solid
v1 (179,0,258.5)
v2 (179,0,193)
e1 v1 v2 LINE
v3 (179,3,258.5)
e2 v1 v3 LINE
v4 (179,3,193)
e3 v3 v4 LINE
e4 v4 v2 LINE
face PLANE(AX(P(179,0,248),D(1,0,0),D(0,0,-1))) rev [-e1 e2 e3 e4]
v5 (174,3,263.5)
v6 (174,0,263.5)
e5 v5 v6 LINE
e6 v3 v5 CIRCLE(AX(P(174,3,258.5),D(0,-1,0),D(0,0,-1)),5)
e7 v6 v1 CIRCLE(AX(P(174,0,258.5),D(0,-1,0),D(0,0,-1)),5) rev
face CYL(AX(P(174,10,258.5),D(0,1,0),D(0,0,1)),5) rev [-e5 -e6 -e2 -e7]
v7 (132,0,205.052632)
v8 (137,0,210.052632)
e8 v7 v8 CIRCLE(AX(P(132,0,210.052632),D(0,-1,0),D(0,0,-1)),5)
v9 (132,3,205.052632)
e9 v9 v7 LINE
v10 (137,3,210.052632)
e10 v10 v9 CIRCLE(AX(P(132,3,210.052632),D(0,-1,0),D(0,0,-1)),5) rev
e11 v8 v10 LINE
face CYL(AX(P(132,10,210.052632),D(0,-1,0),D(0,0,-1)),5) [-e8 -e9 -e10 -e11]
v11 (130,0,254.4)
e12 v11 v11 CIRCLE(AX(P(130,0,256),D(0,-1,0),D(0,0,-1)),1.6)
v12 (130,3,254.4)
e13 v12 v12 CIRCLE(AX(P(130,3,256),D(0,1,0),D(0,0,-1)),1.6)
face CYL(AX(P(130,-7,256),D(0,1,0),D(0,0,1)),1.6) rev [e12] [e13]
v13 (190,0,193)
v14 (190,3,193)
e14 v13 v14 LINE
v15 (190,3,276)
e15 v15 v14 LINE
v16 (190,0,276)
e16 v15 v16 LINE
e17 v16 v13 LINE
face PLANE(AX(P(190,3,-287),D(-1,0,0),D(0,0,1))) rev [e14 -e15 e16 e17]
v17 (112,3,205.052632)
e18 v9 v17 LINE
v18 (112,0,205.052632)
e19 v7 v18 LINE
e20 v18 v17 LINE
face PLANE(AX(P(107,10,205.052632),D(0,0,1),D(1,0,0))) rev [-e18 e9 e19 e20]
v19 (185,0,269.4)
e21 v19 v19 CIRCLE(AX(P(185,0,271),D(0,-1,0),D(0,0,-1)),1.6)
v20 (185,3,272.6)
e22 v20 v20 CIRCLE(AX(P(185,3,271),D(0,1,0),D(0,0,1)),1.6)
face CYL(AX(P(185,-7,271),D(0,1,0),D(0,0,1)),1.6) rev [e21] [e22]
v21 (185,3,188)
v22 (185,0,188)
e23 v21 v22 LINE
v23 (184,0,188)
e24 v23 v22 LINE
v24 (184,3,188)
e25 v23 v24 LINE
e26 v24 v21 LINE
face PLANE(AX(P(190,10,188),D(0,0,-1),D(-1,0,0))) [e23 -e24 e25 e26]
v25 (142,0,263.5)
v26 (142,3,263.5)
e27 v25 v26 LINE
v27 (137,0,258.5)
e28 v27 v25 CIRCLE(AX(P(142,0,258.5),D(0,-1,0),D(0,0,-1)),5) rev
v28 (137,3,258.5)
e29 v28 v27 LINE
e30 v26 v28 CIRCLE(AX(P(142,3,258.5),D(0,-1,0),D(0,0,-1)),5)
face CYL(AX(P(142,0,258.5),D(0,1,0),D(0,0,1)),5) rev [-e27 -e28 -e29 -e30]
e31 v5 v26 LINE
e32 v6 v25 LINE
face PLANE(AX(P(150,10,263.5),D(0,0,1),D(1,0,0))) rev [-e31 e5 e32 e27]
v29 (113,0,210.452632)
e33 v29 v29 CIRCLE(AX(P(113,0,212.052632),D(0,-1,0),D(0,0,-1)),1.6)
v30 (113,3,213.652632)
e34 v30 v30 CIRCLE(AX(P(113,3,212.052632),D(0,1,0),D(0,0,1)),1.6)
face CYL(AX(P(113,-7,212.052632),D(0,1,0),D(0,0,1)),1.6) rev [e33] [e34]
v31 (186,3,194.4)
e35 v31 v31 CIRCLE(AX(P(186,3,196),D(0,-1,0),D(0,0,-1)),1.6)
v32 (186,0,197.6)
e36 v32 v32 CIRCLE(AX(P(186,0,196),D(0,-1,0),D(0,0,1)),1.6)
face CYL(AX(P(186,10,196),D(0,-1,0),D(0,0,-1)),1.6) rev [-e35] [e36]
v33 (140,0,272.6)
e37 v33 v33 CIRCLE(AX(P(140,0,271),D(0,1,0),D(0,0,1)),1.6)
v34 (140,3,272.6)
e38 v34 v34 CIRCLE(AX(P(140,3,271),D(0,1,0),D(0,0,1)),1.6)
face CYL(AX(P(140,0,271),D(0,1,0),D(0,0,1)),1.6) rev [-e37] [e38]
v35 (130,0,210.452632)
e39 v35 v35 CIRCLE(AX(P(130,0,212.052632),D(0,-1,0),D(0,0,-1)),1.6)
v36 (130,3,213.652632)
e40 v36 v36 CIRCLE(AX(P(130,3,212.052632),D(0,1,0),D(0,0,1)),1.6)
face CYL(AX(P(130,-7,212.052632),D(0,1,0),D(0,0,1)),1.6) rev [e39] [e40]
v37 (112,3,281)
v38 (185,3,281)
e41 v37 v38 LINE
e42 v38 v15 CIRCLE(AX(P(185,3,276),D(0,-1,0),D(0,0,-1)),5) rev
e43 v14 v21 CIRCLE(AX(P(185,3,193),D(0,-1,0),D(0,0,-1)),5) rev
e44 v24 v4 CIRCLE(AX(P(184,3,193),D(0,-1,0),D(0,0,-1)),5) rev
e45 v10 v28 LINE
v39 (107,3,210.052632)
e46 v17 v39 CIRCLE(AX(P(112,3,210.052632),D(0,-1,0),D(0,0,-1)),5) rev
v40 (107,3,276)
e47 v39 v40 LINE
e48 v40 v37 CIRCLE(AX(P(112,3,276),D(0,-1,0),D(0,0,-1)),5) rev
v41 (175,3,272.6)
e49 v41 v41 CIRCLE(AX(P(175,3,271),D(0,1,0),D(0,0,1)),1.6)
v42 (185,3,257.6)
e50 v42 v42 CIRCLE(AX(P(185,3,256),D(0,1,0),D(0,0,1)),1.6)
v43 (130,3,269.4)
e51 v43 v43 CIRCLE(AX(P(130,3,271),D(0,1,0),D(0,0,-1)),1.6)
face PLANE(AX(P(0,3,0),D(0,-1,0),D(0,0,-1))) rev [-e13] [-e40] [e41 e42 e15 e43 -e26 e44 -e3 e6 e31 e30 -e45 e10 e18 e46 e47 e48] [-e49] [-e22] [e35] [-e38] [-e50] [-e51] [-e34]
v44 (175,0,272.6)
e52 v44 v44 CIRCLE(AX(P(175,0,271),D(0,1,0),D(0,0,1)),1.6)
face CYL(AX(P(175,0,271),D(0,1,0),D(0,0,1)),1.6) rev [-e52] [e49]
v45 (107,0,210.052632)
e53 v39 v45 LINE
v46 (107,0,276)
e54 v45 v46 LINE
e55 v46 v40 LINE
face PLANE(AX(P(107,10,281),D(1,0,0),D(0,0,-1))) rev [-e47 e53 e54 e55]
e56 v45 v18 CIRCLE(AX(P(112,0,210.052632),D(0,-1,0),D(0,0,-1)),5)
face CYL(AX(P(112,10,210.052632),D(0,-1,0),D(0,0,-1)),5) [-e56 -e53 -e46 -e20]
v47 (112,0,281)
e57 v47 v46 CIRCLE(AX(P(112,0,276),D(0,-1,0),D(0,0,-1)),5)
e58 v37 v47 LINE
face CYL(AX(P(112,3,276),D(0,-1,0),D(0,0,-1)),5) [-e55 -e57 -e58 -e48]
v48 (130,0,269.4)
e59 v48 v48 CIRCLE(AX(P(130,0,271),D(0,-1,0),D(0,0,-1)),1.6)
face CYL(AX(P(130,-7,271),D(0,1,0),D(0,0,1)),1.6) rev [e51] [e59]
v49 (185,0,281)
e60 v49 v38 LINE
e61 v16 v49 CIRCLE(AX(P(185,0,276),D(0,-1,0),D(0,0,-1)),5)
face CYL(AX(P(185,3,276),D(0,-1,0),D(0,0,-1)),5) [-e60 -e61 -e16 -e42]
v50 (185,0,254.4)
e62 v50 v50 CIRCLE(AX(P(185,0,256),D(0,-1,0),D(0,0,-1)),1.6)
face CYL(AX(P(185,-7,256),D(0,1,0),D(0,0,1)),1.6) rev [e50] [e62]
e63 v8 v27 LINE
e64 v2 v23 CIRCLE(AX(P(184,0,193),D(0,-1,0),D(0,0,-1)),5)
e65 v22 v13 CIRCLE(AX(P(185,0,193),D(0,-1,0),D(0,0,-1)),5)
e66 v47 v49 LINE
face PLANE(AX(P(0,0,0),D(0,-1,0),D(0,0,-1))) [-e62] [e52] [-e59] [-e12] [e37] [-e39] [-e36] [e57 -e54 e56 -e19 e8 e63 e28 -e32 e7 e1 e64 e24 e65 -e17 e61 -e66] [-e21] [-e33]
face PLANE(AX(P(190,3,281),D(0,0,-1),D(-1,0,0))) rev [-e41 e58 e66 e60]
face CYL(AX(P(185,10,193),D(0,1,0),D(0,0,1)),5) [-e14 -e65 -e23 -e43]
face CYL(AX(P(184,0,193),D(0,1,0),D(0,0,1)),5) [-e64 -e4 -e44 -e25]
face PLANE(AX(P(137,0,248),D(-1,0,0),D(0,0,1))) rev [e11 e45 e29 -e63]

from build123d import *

# Parameters (mm, degrees)
EXTRUDE_1049_DEPTH      = 3
SKETCH_2_R              = 37.5
SKETCH_2_R_2            = 1.6
CUT_EXTRUDE_1714_DEPTH  = 3
SKETCH_8_W              = 65
SKETCH_8_H              = 25
CUT_EXTRUDE_2586_DEPTH  = 3
SKETCH_41_W             = 55
SKETCH_41_H             = 60
CUT_EXTRUDE_2_DEPTH     = 10
SKETCH_10_W             = 65
SKETCH_10_H             = 30
CUT_EXTRUDE_3792_DEPTH  = 3
SKETCH_11_R             = 1.6
SKETCH_11_W             = 42
SKETCH_11_H             = 28
CUT_EXTRUDE_4901_DEPTH  = 3
SKETCH_13_R             = 1.6
CUT_EXTRUDE_5557_DEPTH  = 3
SKETCH_14_R             = 2
CUT_EXTRUDE_5907_DEPTH  = 3
SKETCH_15_R             = 2
CUT_EXTRUDE_6167_DEPTH  = 3
SKETCH_16_R             = 1.6
CUT_EXTRUDE_6674_DEPTH  = 3
SKETCH_19_R             = 2
SKETCH_19_R_2           = 2.5
CUT_EXTRUDE_7840_DEPTH  = 3
SKETCH_21_R             = 1.6
CUT_EXTRUDE_7992_DEPTH  = 3
CUT_EXTRUDE_9_DEPTH     = 10
SKETCH_33_R             = 1.6
PC_DEPTH                = 10
SKETCH_36_R             = 1.6
CUT_EXTRUDE_9335_DEPTH  = 345.206333469
SKETCH_29_R             = 1.6
CUT_EXTRUDE_9717_DEPTH  = 10
SKETCH_39_R             = 1.6
CUT_EXTRUDE_10319_DEPTH = 10
SKETCH_42_W             = 40
SKETCH_42_H             = 40
CUT_EXTRUDE_11_DEPTH    = 10
SKETCH_34_R             = 1.6
UWB_DEPTH               = 10
SKETCH_47_R             = 1.6
CUT_EXTRUDE_13152_DEPTH = 345.206333469
SKETCH_48_R             = 1.6
CUT_EXTRUDE_14_DEPTH    = 345.206333469
CUT_EXTRUDE_6623_DEPTH  = 10
FILLET_13947_R          = 5
FILLET_14546_R          = 2
SKETCH_53_R             = 1.6
RFID_DEPTH              = 10
SKETCH_54_R             = 1.6
CUT_EXTRUDE_19167_DEPTH = 10
SKETCH_55_OUTSIDE_W     = 518.68
SKETCH_55_OUTSIDE_H     = 706.68
CUT_EXTRUDE_17_DEPTH    = 10
FILLET_1_R              = 5
SKETCH_56_W             = 16
SKETCH_56_H             = 59
CUT_EXTRUDE_18_DEPTH    = 10
SKETCH_57_R             = 1.55
CUT_EXTRUDE_19_DEPTH    = 10
SKETCH_59_R             = 1.6
CUT_EXTRUDE_20_DEPTH    = 10
FILLET_2_R              = 2
SKETCH_60_W             = 42
SKETCH_60_H             = 75.5
CUT_EXTRUDE_21_DEPTH    = 10
SKETCH_61_W             = 23.311710065
SKETCH_61_H             = 85.935142547
CUT_EXTRUDE_22_DEPTH    = 10
SKETCH_62_W             = 30
SKETCH_62_H             = 17.052631579
CUT_EXTRUDE_23_DEPTH    = 10
SKETCH_63_R             = 1.6
CUT_EXTRUDE_24_DEPTH    = 10
FILLET_3_R              = 5


with BuildPart() as part:
    # 草图1 → Extrude 1049 (new body)
    with BuildSketch(Plane(origin=(0, 0, 0), x_dir=(1, 0, 0), z_dir=(0, 1, 0))):
        Polygon((190, 287), (101.545, 287), (79.605689771, 249), (-79.605689771, 249), (-101.545, 287), (-190, 287), (-190, 0), (-190, -281), (-144.091695942, -281), (-98.660254038, -281), (-74.411542732, -239), (74.411542732, -239), (98.660254038, -281), (144.091695942, -281), (190, -281), (190, 0), align=None)
    extrude(amount=EXTRUDE_1049_DEPTH)

    # 草图2 → Cut-Extrude 1714 (cut)
    with BuildSketch(Plane(origin=(0, 3, 0), x_dir=(1, 0, 0), z_dir=(0, 1, 0))):
        Circle(SKETCH_2_R)
        with Locations((38.97114317, 22.5)):
            Circle(SKETCH_2_R_2)
        with Locations((0, -45)):
            Circle(SKETCH_2_R_2)
        with Locations((-38.97114317, 22.5)):
            Circle(SKETCH_2_R_2)
    extrude(amount=-CUT_EXTRUDE_1714_DEPTH, mode=Mode.SUBTRACT)

    # 草图8 → Cut-Extrude 2586 (cut)
    with BuildSketch(Plane(origin=(0, 3, 0), x_dir=(1, 0, 0), z_dir=(0, 1, 0))):
        with Locations((115, -161.5)):
            Rectangle(SKETCH_8_W, SKETCH_8_H)
        with Locations((-115, -161.5)):
            Rectangle(SKETCH_8_W, SKETCH_8_H)
    extrude(amount=-CUT_EXTRUDE_2586_DEPTH, mode=Mode.SUBTRACT)

    # 草图41 → 减重过线孔2 (cut)
    with BuildSketch(Plane(origin=(0, 3, 0), x_dir=(1, 0, 0), z_dir=(0, 1, 0))):
        with Locations((-102.5, 70)):
            Rectangle(SKETCH_41_W, SKETCH_41_H)
        with Locations((102.5, 70)):
            Rectangle(SKETCH_41_W, SKETCH_41_H)
        with Locations((102.5, -70)):
            Rectangle(SKETCH_41_W, SKETCH_41_H)
        with Locations((-102.5, -70)):
            Rectangle(SKETCH_41_W, SKETCH_41_H)
    extrude(amount=-CUT_EXTRUDE_2_DEPTH, mode=Mode.SUBTRACT)

    # 草图10 → Cut-Extrude 3792 (cut)
    with BuildSketch(Plane(origin=(0, 3, 0), x_dir=(1, 0, 0), z_dir=(0, 1, 0))):
        with Locations((-130, 167)):
            Rectangle(SKETCH_10_W, SKETCH_10_H)
        with Locations((130, 167)):
            Rectangle(SKETCH_10_W, SKETCH_10_H)
    extrude(amount=-CUT_EXTRUDE_3792_DEPTH, mode=Mode.SUBTRACT)

    # 草图11 → Cut-Extrude 4901 (cut)
    with BuildSketch(Plane(origin=(0, 3, 0), x_dir=(1, 0, 0), z_dir=(0, 1, 0))):
        with Locations((-153.5, 259)):
            Circle(SKETCH_11_R)
        with Locations((-162.5, 259)):
            Circle(SKETCH_11_R)
        with Locations((-153.5, 209)):
            Circle(SKETCH_11_R)
        with Locations((-162.5, 209)):
            Circle(SKETCH_11_R)
        with Locations((153.5, 259)):
            Circle(SKETCH_11_R)
        with Locations((162.5, 259)):
            Circle(SKETCH_11_R)
        with Locations((153.5, 209)):
            Circle(SKETCH_11_R)
        with Locations((162.5, 209)):
            Circle(SKETCH_11_R)
        with Locations((162.5, -209)):
            Circle(SKETCH_11_R)
        with Locations((153.5, -209)):
            Circle(SKETCH_11_R)
        with Locations((162.5, -259)):
            Circle(SKETCH_11_R)
        with Locations((153.5, -259)):
            Circle(SKETCH_11_R)
        with Locations((-162.5, -209)):
            Circle(SKETCH_11_R)
        with Locations((-153.5, -209)):
            Circle(SKETCH_11_R)
        with Locations((-153.5, -259)):
            Circle(SKETCH_11_R)
        with Locations((-162.5, -259)):
            Circle(SKETCH_11_R)
        with Locations((-158, 234)):
            Rectangle(SKETCH_11_W, SKETCH_11_H)
        with Locations((158, 234)):
            Rectangle(SKETCH_11_W, SKETCH_11_H)
        with Locations((158, -234)):
            Rectangle(SKETCH_11_W, SKETCH_11_H)
        with Locations((-158, -234)):
            Rectangle(SKETCH_11_W, SKETCH_11_H)
    extrude(amount=-CUT_EXTRUDE_4901_DEPTH, mode=Mode.SUBTRACT)

    # 草图13 → Cut-Extrude 5557 (cut)
    with BuildSketch(Plane(origin=(0, 3, 0), x_dir=(1, 0, 0), z_dir=(0, 1, 0))):
        with Locations((25, 176)):
            Circle(SKETCH_13_R)
        with Locations((25, 226)):
            Circle(SKETCH_13_R)
        with Locations((-25, 226)):
            Circle(SKETCH_13_R)
        with Locations((-25, 176)):
            Circle(SKETCH_13_R)
    extrude(amount=-CUT_EXTRUDE_5557_DEPTH, mode=Mode.SUBTRACT)

    # 草图14 → Cut-Extrude 5907 (cut)
    with BuildSketch(Plane(origin=(0, 3, 0), x_dir=(1, 0, 0), z_dir=(0, 1, 0))):
        with Locations((-47.5, 239)):
            Circle(SKETCH_14_R)
        with Locations((-47.5, 214)):
            Circle(SKETCH_14_R)
        with Locations((47.5, 214)):
            Circle(SKETCH_14_R)
        with Locations((47.5, 239)):
            Circle(SKETCH_14_R)
        with Locations((-47.5, -207)):
            Circle(SKETCH_14_R)
        with Locations((-47.5, -232)):
            Circle(SKETCH_14_R)
        with Locations((47.5, -232)):
            Circle(SKETCH_14_R)
        with Locations((47.5, -207)):
            Circle(SKETCH_14_R)
    extrude(amount=-CUT_EXTRUDE_5907_DEPTH, mode=Mode.SUBTRACT)

    # 草图15 → Cut-Extrude 6167 (cut)
    with BuildSketch(Plane(origin=(0, 3, 0), x_dir=(1, 0, 0), z_dir=(0, 1, 0))):
        with Locations((155, 47.5)):
            Circle(SKETCH_15_R)
        with Locations((180, 47.5)):
            Circle(SKETCH_15_R)
        with Locations((180, -47.5)):
            Circle(SKETCH_15_R)
        with Locations((155, -47.5)):
            Circle(SKETCH_15_R)
        with Locations((-155, -47.5)):
            Circle(SKETCH_15_R)
        with Locations((-180, -47.5)):
            Circle(SKETCH_15_R)
        with Locations((-180, 47.5)):
            Circle(SKETCH_15_R)
        with Locations((-155, 47.5)):
            Circle(SKETCH_15_R)
    extrude(amount=-CUT_EXTRUDE_6167_DEPTH, mode=Mode.SUBTRACT)

    # 草图16 → Cut-Extrude 6674 (cut)
    with BuildSketch(Plane(origin=(0, 3, 0), x_dir=(1, 0, 0), z_dir=(0, 1, 0))):
        with Locations((-64, 229)):
            Circle(SKETCH_16_R)
        with Locations((-64, 117)):
            Circle(SKETCH_16_R)
        with Locations((-64, 5)):
            Circle(SKETCH_16_R)
        with Locations((-64, -107)):
            Circle(SKETCH_16_R)
        with Locations((-64, -219)):
            Circle(SKETCH_16_R)
        with Locations((64, 229)):
            Circle(SKETCH_16_R)
        with Locations((64, -107)):
            Circle(SKETCH_16_R)
        with Locations((64, 5)):
            Circle(SKETCH_16_R)
        with Locations((64, 117)):
            Circle(SKETCH_16_R)
        with Locations((64, -219)):
            Circle(SKETCH_16_R)
    extrude(amount=-CUT_EXTRUDE_6674_DEPTH, mode=Mode.SUBTRACT)

    # 草图19 → Cut-Extrude 7840 (cut)
    with BuildSketch(Plane(origin=(0, 3, 0), x_dir=(1, 0, 0), z_dir=(0, 1, 0))):
        with Locations((-177.5, -78)):
            Circle(SKETCH_19_R)
        with Locations((-177.5, -94)):
            Circle(SKETCH_19_R_2)
        with Locations((-177.5, 94)):
            Circle(SKETCH_19_R_2)
        with Locations((-177.5, 78)):
            Circle(SKETCH_19_R)
        with Locations((177.5, -94)):
            Circle(SKETCH_19_R_2)
        with Locations((177.5, -78)):
            Circle(SKETCH_19_R)
        with Locations((177.5, 78)):
            Circle(SKETCH_19_R)
        with Locations((177.5, 94)):
            Circle(SKETCH_19_R_2)
    extrude(amount=-CUT_EXTRUDE_7840_DEPTH, mode=Mode.SUBTRACT)

    # 草图21 → Cut-Extrude 7992 (cut)
    with BuildSketch(Plane(origin=(0, 3, 0), x_dir=(1, 0, 0), z_dir=(0, 1, 0))):
        with Locations((0, -93)):
            Circle(SKETCH_21_R)
    extrude(amount=-CUT_EXTRUDE_7992_DEPTH, mode=Mode.SUBTRACT)

    # 草图32 → 切除-拉伸9 (cut)
    with BuildSketch(Plane(origin=(0, 3, 0), x_dir=(1, 0, 0), z_dir=(0, 1, 0))):
        with BuildLine():
            Line((-34.5, -190), (34.5, -190))
            ThreePointArc((34.5, -190), (36.621320344, -189.121320344), (37.5, -187))
            Line((37.5, -187), (37.5, -133))
            ThreePointArc((37.5, -133), (36.621320344, -130.878679656), (34.5, -130))
            Line((34.5, -130), (-34.5, -130))
            ThreePointArc((-34.5, -130), (-36.621320344, -130.878679656), (-37.5, -133))
            Line((-37.5, -133), (-37.5, -187))
            ThreePointArc((-37.5, -187), (-36.621320344, -189.121320344), (-34.5, -190))
        make_face()
    extrude(amount=-CUT_EXTRUDE_9_DEPTH, mode=Mode.SUBTRACT)

    # 草图33 → PC座固定孔 (cut)
    with BuildSketch(Plane(origin=(0, 3, 0), x_dir=(1, 0, 0), z_dir=(0, 1, 0))):
        with Locations((-42.5, -120.5)):
            Circle(SKETCH_33_R)
        with Locations((42.5, -120.5)):
            Circle(SKETCH_33_R)
    extrude(amount=-PC_DEPTH, mode=Mode.SUBTRACT)

    # 草图36 → Cut-Extrude 9335 (cut, through all)
    with BuildSketch(Plane(origin=(0, 3, 0), x_dir=(1, 0, 0), z_dir=(0, 1, 0))):
        with Locations((-80, -231)):
            Circle(SKETCH_36_R)
        with Locations((-80, -219)):
            Circle(SKETCH_36_R)
        with Locations((80, -219)):
            Circle(SKETCH_36_R)
        with Locations((80, -231)):
            Circle(SKETCH_36_R)
        with Locations((-80, 241)):
            Circle(SKETCH_36_R)
        with Locations((-80, 229)):
            Circle(SKETCH_36_R)
        with Locations((80, 229)):
            Circle(SKETCH_36_R)
        with Locations((80, 241)):
            Circle(SKETCH_36_R)
    extrude(amount=-CUT_EXTRUDE_9335_DEPTH, mode=Mode.SUBTRACT)

    # 草图29 → Cut-Extrude 9717 (cut)
    with BuildSketch(Plane(origin=(0, 3, 0), x_dir=(1, 0, 0), z_dir=(0, 1, 0))):
        with Locations((48, 120)):
            Circle(SKETCH_29_R)
        with Locations((0, 86)):
            Circle(SKETCH_29_R)
        with Locations((0, 154)):
            Circle(SKETCH_29_R)
        with Locations((-48, 120)):
            Circle(SKETCH_29_R)
        with BuildLine():
            Line((40, 98), (40, 142))
            ThreePointArc((40, 142), (39.121320344, 144.121320344), (37, 145))
            Line((37, 145), (-37, 145))
            ThreePointArc((-37, 145), (-39.121320344, 144.121320344), (-40, 142))
            Line((-40, 142), (-40, 98))
            ThreePointArc((-40, 98), (-39.121320344, 95.878679656), (-37, 95))
            Line((-37, 95), (37, 95))
            ThreePointArc((37, 95), (39.121320344, 95.878679656), (40, 98))
        make_face()
    extrude(amount=-CUT_EXTRUDE_9717_DEPTH, mode=Mode.SUBTRACT)

    # 草图39 → Cut-Extrude 10319 (cut)
    with BuildSketch(Plane(origin=(0, 3, 0), x_dir=(1, 0, 0), z_dir=(0, 1, 0))):
        with Locations((185, -271)):
            Circle(SKETCH_39_R)
        with Locations((185, -256)):
            Circle(SKETCH_39_R)
        with Locations((130, -256)):
            Circle(SKETCH_39_R)
        with Locations((130, -271)):
            Circle(SKETCH_39_R)
        with Locations((-130, -271)):
            Circle(SKETCH_39_R)
        with Locations((-130, -256)):
            Circle(SKETCH_39_R)
        with Locations((-185, -256)):
            Circle(SKETCH_39_R)
        with Locations((-185, -271)):
            Circle(SKETCH_39_R)
        with Locations((-130, 262)):
            Circle(SKETCH_39_R)
        with Locations((-130, 277)):
            Circle(SKETCH_39_R)
        with Locations((185, 262)):
            Circle(SKETCH_39_R)
        with Locations((185, 277)):
            Circle(SKETCH_39_R)
        with Locations((-185, 277)):
            Circle(SKETCH_39_R)
        with Locations((-185, 262)):
            Circle(SKETCH_39_R)
        with Locations((130, 277)):
            Circle(SKETCH_39_R)
        with Locations((130, 262)):
            Circle(SKETCH_39_R)
    extrude(amount=-CUT_EXTRUDE_10319_DEPTH, mode=Mode.SUBTRACT)

    # 草图42 → 切除-拉伸11 (cut)
    with BuildSketch(Plane(origin=(0, 3, 0), x_dir=(1, 0, 0), z_dir=(0, 1, 0))):
        with Locations((0, 201)):
            Rectangle(SKETCH_42_W, SKETCH_42_H)
    extrude(amount=-CUT_EXTRUDE_11_DEPTH, mode=Mode.SUBTRACT)

    # 草图34 → UWB固定孔 (cut)
    with BuildSketch(Plane(origin=(0, 3, 0), x_dir=(1, 0, 0), z_dir=(0, 1, 0))):
        with Locations((90, 168)):
            Circle(SKETCH_34_R)
        with Locations((71, 187)):
            Circle(SKETCH_34_R)
        with Locations((90, 206)):
            Circle(SKETCH_34_R)
        with Locations((109, 187)):
            Circle(SKETCH_34_R)
    extrude(amount=-UWB_DEPTH, mode=Mode.SUBTRACT)

    # 草图47 → Cut-Extrude 13152 (cut, through all)
    with BuildSketch(Plane(origin=(0, 3, 0), x_dir=(1, 0, 0), z_dir=(0, 1, 0))):
        with Locations((140, 277)):
            Circle(SKETCH_47_R)
        with Locations((185, -271)):
            Circle(SKETCH_47_R)
        with Locations((95, -231)):
            Circle(SKETCH_47_R)
        with Locations((175, -271)):
            Circle(SKETCH_47_R)
        with Locations((140, 213)):
            Circle(SKETCH_47_R)
        with Locations((175, -207)):
            Circle(SKETCH_47_R)
        with Locations((-140, -271)):
            Circle(SKETCH_47_R)
        with Locations((-140, -207)):
            Circle(SKETCH_47_R)
        with Locations((-175, 213)):
            Circle(SKETCH_47_R)
        with Locations((-95, 237)):
            Circle(SKETCH_47_R)
        with Locations((185, 277)):
            Circle(SKETCH_47_R)
        with Locations((175, 277)):
            Circle(SKETCH_47_R)
        with Locations((95, 237)):
            Circle(SKETCH_47_R)
        with Locations((175, 213)):
            Circle(SKETCH_47_R)
        with Locations((-175, 277)):
            Circle(SKETCH_47_R)
        with Locations((-185, 277)):
            Circle(SKETCH_47_R)
        with Locations((140, -207)):
            Circle(SKETCH_47_R)
        with Locations((140, -271)):
            Circle(SKETCH_47_R)
        with Locations((-175, -207)):
            Circle(SKETCH_47_R)
        with Locations((-140, 213)):
            Circle(SKETCH_47_R)
        with Locations((-175, -271)):
            Circle(SKETCH_47_R)
        with Locations((-95, -231)):
            Circle(SKETCH_47_R)
        with Locations((-185, -271)):
            Circle(SKETCH_47_R)
        with Locations((-140, 277)):
            Circle(SKETCH_47_R)
    extrude(amount=-CUT_EXTRUDE_13152_DEPTH, mode=Mode.SUBTRACT)

    # 草图48 → 切除-拉伸14 (cut, through all)
    with BuildSketch(Plane(origin=(0, 3, 0), x_dir=(1, 0, 0), z_dir=(0, 1, 0))):
        with Locations((-44.5, -46)):
            Circle(SKETCH_48_R)
        with Locations((44.5, -46)):
            Circle(SKETCH_48_R)
        with Locations((-9, -196)):
            Circle(SKETCH_48_R)
        with Locations((9, -196)):
            Circle(SKETCH_48_R)
    extrude(amount=-CUT_EXTRUDE_14_DEPTH, mode=Mode.SUBTRACT)

    # 草图51 → 6623电机过线孔 (cut)
    with BuildSketch(Plane(origin=(0, 3, 0), x_dir=(1, 0, 0), z_dir=(0, 1, 0))):
        with BuildLine():
            Line((-20.5, 67.5), (20.5, 67.5))
            ThreePointArc((20.5, 67.5), (21.914213562, 66.914213562), (22.5, 65.5))
            Line((22.5, 65.5), (22.5, 54.5))
            ThreePointArc((22.5, 54.5), (21.914213562, 53.085786438), (20.5, 52.5))
            Line((20.5, 52.5), (-20.5, 52.5))
            ThreePointArc((-20.5, 52.5), (-21.914213562, 53.085786438), (-22.5, 54.5))
            Line((-22.5, 54.5), (-22.5, 65.5))
            ThreePointArc((-22.5, 65.5), (-21.914213562, 66.914213562), (-20.5, 67.5))
        make_face()
    extrude(amount=-CUT_EXTRUDE_6623_DEPTH, mode=Mode.SUBTRACT)

    # Fillet 13947
    fillet_13947_edges = [part.edges().sort_by_distance(p)[0] for p in [
        (-190, 1.5, -287),
        (-101.545, 1.5, -287),
        (-79.605689771, 1.5, -249),
        (79.605689771, 1.5, -249),
        (101.545, 1.5, -287),
        (190, 1.5, -287),
        (190, 1.5, 281),
        (98.660254038, 1.5, 281),
        (74.411542732, 1.5, 239),
        (-74.411542732, 1.5, 239),
        (-98.660254038, 1.5, 281),
        (-190, 1.5, 281),
    ]]
    fillet(fillet_13947_edges, radius=FILLET_13947_R)

    # Fillet 14546
    fillet_14546_edges = [part.edges().sort_by_distance(p)[0] for p in [
        (-147.5, 1.5, 149),
        (-82.5, 1.5, 149),
        (-82.5, 1.5, 174),
        (-147.5, 1.5, 174),
        (82.5, 1.5, 149),
        (147.5, 1.5, 149),
        (147.5, 1.5, 174),
        (82.5, 1.5, 174),
        (-130, 1.5, -100),
        (-75, 1.5, -100),
        (-75, 1.5, -40),
        (-130, 1.5, -40),
        (-130, 1.5, 100),
        (-130, 1.5, 40),
        (-75, 1.5, 40),
        (-75, 1.5, 100),
        (130, 1.5, 100),
        (75, 1.5, 100),
        (75, 1.5, 40),
        (130, 1.5, 40),
        (130, 1.5, -100),
        (130, 1.5, -40),
        (75, 1.5, -40),
        (75, 1.5, -100),
        (-97.5, 1.5, -152),
        (-162.5, 1.5, -152),
        (-162.5, 1.5, -182),
        (-97.5, 1.5, -182),
        (162.5, 1.5, -182),
        (-137, 1.5, -220),
        (-179, 1.5, -220),
        (-179, 1.5, -248),
        (-137, 1.5, -248),
        (-179, 1.5, 220),
        (-137, 1.5, 220),
        (-137, 1.5, 248),
        (179, 1.5, 248),
        (137, 1.5, 248),
        (137, 1.5, 220),
        (179, 1.5, 220),
        (179, 1.5, -248),
        (179, 1.5, -220),
        (137, 1.5, -220),
        (137, 1.5, -248),
        (20, 1.5, -181),
        (-20, 1.5, -181),
        (-20, 1.5, -221),
        (20, 1.5, -221),
        (-179, 1.5, 248),
        (162.5, 1.5, -152),
        (97.5, 1.5, -152),
        (97.5, 1.5, -182),
    ]]
    fillet(fillet_14546_edges, radius=FILLET_14546_R)

    # 草图53 → RFID固定孔 (cut)
    with BuildSketch(Plane(origin=(0, 3, 0), x_dir=(1, 0, 0), z_dir=(0, 1, 0))):
        with Locations((-135, -31)):
            Circle(SKETCH_53_R)
        with Locations((-85, -31)):
            Circle(SKETCH_53_R)
        with Locations((-85, 31)):
            Circle(SKETCH_53_R)
        with Locations((-135, 31)):
            Circle(SKETCH_53_R)
        with Locations((135, 31)):
            Circle(SKETCH_53_R)
        with Locations((85, 31)):
            Circle(SKETCH_53_R)
        with Locations((85, -31)):
            Circle(SKETCH_53_R)
        with Locations((135, -31)):
            Circle(SKETCH_53_R)
    extrude(amount=-RFID_DEPTH, mode=Mode.SUBTRACT)

    # 草图54 → Cut-Extrude 19167 (cut)
    with BuildSketch(Plane.XZ):
        with Locations((-102.122350269, -278)):
            Circle(SKETCH_54_R)
        with Locations((-92.122350269, -260.679491924)):
            Circle(SKETCH_54_R)
        with Locations((92.122350269, -260.679491924)):
            Circle(SKETCH_54_R)
        with Locations((102.122350269, -278)):
            Circle(SKETCH_54_R)
        with Locations((102.122350269, 272)):
            Circle(SKETCH_54_R)
        with Locations((92.122350269, 254.679491924)):
            Circle(SKETCH_54_R)
        with Locations((-92.122350269, 254.679491924)):
            Circle(SKETCH_54_R)
        with Locations((-102.122350269, 272)):
            Circle(SKETCH_54_R)
    extrude(amount=-CUT_EXTRUDE_19167_DEPTH, mode=Mode.SUBTRACT)

    # 草图55 outside → 切除-拉伸17 (cut)
    with BuildSketch(Plane.XZ):
        with Locations((0, -3)):
            Rectangle(SKETCH_55_OUTSIDE_W, SKETCH_55_OUTSIDE_H)
        with BuildLine():
            Line((190, 281), (101.547005384, 281))
            ThreePointArc((101.547005384, 281), (99.047005384, 280.330127019), (97.216878365, 278.5))
            Line((97.216878365, 278.5), (87, 260.803847577))
            Line((87, 260.803847577), (87, 224))
            Line((87, 224), (125, 188))
            Line((125, 188), (190, 188))
            Line((190, 188), (190, 281))
        make_face(mode=Mode.SUBTRACT)
    extrude(amount=-CUT_EXTRUDE_17_DEPTH, mode=Mode.SUBTRACT)

    # 圆角1
    fillet_1_edges = [part.edges().sort_by_distance(p)[0] for p in [
        (190, 1.5, 188),
        (87, 1.5, 260.803847577),
        (87, 1.5, 224),
        (125, 1.5, 188),
    ]]
    fillet(fillet_1_edges, radius=FILLET_1_R)

    # 草图56 → 切除-拉伸18 (cut)
    with BuildSketch(Plane.XZ):
        with Locations((158, 234)):
            Rectangle(SKETCH_56_W, SKETCH_56_H)
    extrude(amount=-CUT_EXTRUDE_18_DEPTH, mode=Mode.SUBTRACT)

    # 草图57 → 切除-拉伸19 (cut)
    with BuildSketch(Plane.XZ):
        with Locations((150, 206.05)):
            Circle(SKETCH_57_R)
        with Locations((166, 206.05)):
            Circle(SKETCH_57_R)
        with Locations((166, 261.95)):
            Circle(SKETCH_57_R)
        with Locations((150, 261.95)):
            Circle(SKETCH_57_R)
    extrude(amount=-CUT_EXTRUDE_19_DEPTH, mode=Mode.SUBTRACT)

    # 草图59 → 切除-拉伸20 (cut)
    with BuildSketch(Plane.XZ):
        with Locations((130, 196)):
            Circle(SKETCH_59_R)
        with Locations((186, 196)):
            Circle(SKETCH_59_R)
    extrude(amount=-CUT_EXTRUDE_20_DEPTH, mode=Mode.SUBTRACT)

    # 圆角2
    fillet_2_edges = [part.edges().sort_by_distance(p)[0] for p in [
        (150, 1.5, 248),
        (166, 1.5, 248),
        (166, 1.5, 220),
        (150, 1.5, 220),
    ]]
    fillet(fillet_2_edges, radius=FILLET_2_R)

    # 草图60 → 切除-拉伸21 (cut)
    with BuildSketch(Plane.XZ):
        with Locations((158, 225.75)):
            Rectangle(SKETCH_60_W, SKETCH_60_H)
    extrude(amount=-CUT_EXTRUDE_21_DEPTH, mode=Mode.SUBTRACT)

    # 草图61 → 切除-拉伸22 (cut)
    with BuildSketch(Plane.XZ):
        with Locations((95.344144968, 238.032428727)):
            Rectangle(SKETCH_61_W, SKETCH_61_H)
    extrude(amount=-CUT_EXTRUDE_22_DEPTH, mode=Mode.SUBTRACT)

    # 草图62 → 切除-拉伸23 (cut)
    with BuildSketch(Plane.XZ):
        with Locations((122, 196.52631579)):
            Rectangle(SKETCH_62_W, SKETCH_62_H)
    extrude(amount=-CUT_EXTRUDE_23_DEPTH, mode=Mode.SUBTRACT)

    # 草图63 → 切除-拉伸24 (cut)
    with BuildSketch(Plane(origin=(0, 3, 0), x_dir=(1, 0, 0), z_dir=(0, 1, 0))):
        with Locations((130, -212.052631579)):
            Circle(SKETCH_63_R)
        with Locations((113, -212.052631579)):
            Circle(SKETCH_63_R)
    extrude(amount=-CUT_EXTRUDE_24_DEPTH, mode=Mode.SUBTRACT)

    # 圆角3
    fillet_3_edges = [part.edges().sort_by_distance(p)[0] for p in [
        (179, 1.5, 263.5),
        (179, 1.5, 188),
        (107, 1.5, 281),
        (107, 1.5, 205.052631579),
        (137, 1.5, 205.052631579),
        (137, 1.5, 263.5),
    ]]
    fillet(fillet_3_edges, radius=FILLET_3_R)


solid = part.part
